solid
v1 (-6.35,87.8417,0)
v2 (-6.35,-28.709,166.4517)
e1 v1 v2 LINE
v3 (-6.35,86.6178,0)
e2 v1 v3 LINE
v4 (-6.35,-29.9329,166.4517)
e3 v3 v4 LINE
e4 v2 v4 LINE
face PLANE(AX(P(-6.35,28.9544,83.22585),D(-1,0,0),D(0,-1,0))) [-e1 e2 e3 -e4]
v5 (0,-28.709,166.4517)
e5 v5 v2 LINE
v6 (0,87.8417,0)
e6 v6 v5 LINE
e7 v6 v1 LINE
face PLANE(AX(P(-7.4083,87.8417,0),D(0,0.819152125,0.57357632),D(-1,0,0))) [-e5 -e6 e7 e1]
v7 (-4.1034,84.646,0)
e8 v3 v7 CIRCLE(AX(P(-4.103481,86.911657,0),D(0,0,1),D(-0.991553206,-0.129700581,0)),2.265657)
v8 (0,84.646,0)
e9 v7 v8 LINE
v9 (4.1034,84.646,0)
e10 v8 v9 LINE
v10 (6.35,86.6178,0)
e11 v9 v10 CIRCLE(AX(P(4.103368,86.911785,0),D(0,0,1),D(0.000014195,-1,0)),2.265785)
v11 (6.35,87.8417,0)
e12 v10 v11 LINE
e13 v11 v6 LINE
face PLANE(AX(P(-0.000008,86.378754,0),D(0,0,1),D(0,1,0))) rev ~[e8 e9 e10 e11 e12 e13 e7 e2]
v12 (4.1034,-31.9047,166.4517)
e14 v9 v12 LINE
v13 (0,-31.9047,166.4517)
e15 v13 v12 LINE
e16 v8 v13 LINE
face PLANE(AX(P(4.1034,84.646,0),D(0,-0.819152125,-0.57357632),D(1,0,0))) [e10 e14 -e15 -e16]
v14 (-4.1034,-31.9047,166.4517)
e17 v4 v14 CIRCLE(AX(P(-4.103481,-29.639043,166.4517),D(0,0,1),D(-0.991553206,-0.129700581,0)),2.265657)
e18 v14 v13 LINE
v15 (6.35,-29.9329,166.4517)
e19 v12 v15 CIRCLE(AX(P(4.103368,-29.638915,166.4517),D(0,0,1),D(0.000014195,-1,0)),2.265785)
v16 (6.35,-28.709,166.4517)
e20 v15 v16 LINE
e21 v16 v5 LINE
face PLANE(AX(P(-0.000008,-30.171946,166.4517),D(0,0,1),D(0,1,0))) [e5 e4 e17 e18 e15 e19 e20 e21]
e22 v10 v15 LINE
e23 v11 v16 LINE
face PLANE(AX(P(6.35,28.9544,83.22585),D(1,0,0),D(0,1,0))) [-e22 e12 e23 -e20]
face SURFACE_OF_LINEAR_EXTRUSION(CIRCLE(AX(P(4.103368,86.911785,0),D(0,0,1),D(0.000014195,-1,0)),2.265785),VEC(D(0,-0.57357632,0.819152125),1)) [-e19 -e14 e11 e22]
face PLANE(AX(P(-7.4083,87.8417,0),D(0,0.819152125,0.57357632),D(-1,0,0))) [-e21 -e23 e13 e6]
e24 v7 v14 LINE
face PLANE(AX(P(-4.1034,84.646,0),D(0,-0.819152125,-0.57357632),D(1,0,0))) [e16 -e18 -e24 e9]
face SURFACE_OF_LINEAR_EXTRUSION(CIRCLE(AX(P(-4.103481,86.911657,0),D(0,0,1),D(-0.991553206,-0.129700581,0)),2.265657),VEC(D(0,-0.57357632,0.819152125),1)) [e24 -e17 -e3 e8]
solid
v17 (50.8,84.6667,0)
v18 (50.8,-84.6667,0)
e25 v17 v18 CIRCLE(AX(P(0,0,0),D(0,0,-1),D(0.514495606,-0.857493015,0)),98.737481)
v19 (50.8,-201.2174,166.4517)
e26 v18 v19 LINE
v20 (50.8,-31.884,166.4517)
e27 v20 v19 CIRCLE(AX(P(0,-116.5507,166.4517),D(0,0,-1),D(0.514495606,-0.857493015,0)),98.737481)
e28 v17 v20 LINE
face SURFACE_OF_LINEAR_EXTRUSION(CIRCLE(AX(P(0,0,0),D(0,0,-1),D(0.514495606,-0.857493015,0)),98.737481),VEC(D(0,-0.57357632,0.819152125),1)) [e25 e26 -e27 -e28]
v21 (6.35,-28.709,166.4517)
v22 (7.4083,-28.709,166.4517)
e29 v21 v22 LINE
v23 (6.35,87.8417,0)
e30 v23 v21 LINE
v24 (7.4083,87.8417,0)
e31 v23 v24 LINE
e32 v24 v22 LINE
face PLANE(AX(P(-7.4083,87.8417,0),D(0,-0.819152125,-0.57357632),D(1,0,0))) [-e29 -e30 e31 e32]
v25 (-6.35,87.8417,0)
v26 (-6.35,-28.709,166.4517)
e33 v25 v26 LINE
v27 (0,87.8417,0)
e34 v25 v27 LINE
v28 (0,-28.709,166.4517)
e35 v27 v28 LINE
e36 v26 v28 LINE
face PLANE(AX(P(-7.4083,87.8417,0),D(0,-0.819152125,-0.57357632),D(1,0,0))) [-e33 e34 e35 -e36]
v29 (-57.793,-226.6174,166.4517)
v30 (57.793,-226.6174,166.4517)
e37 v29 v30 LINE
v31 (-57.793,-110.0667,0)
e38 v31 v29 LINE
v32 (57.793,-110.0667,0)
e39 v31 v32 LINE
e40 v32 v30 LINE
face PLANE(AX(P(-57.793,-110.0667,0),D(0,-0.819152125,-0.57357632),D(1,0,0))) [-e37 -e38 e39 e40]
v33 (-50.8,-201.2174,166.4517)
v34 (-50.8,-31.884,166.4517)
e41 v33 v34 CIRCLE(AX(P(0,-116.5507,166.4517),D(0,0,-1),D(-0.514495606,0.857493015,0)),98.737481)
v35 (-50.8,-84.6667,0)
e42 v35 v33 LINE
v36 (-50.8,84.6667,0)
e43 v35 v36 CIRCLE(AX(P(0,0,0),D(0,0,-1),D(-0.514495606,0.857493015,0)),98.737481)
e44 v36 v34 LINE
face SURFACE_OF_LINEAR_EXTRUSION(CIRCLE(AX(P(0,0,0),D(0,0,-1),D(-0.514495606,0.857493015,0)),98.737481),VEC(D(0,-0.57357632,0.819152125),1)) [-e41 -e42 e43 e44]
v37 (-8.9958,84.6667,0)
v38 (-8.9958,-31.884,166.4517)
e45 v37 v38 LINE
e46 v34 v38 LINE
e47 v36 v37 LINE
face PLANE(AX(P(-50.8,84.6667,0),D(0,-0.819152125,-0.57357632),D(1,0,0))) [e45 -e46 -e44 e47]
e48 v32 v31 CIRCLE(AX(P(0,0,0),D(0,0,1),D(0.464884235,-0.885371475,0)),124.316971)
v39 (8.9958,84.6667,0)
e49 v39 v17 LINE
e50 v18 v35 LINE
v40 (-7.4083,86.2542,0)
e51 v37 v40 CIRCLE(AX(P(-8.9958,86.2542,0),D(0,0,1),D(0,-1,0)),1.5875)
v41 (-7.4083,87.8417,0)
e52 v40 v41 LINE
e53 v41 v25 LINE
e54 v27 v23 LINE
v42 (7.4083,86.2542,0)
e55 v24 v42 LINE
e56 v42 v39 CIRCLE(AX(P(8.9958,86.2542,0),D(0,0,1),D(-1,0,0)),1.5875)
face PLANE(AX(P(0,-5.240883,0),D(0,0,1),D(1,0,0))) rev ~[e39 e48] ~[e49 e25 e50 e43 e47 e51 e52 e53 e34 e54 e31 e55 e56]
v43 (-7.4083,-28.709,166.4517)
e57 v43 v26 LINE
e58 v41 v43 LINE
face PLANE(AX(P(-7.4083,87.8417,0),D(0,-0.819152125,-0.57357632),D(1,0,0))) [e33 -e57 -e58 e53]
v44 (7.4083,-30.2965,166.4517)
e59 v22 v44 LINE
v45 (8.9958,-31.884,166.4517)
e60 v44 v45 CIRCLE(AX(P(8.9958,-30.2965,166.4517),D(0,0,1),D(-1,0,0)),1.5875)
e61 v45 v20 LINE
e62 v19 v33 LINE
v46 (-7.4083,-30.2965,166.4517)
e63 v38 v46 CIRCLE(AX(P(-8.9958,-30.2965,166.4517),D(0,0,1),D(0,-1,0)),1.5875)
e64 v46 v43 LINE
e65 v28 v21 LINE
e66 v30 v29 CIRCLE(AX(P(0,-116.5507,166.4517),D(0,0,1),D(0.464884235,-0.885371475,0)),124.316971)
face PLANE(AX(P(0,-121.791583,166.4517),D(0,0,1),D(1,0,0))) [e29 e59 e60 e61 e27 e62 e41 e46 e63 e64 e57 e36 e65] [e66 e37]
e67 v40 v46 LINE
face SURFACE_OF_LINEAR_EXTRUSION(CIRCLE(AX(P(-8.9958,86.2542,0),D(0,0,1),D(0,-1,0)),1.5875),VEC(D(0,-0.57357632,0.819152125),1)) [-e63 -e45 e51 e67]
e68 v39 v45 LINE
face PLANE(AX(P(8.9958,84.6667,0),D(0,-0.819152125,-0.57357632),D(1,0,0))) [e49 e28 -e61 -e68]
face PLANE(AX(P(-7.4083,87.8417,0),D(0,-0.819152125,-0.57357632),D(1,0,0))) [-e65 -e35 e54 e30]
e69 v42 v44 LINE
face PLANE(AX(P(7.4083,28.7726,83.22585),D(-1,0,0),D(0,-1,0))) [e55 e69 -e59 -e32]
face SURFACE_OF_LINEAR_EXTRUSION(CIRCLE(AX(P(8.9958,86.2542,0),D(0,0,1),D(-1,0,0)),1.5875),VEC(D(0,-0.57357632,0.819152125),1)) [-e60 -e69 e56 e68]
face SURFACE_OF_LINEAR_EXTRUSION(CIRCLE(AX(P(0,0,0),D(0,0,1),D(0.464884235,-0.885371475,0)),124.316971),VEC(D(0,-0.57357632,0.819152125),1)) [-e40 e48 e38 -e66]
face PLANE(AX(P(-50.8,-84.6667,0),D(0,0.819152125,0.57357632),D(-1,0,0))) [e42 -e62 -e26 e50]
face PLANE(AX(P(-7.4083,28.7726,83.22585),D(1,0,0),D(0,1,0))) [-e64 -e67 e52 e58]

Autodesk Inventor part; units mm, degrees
ref_plane "YZ Plane" through (0, 0, 0) normal (1, 0, 0) x (0, 1, 0)
ref_plane "XZ Plane" through (0, 0, 0) normal (0, 1, 0) x (-1, 0, 0)
sketch "Sketch1" plane through (0, 0, 0) normal (0, 0, 1) x (1, 0, 0)
  line L0 (-50.8, -84.6667) -> (50.8, -84.6667)
  arc A0 (57.793, -110.0667) -> (-57.793, -110.0667) centre (0, 0) ccw
  arc A1 (-50.8, 84.6667) -> (-50.8, -84.6667) centre (0, 0) ccw
  arc A2 (50.8, -84.6667) -> (50.8, 84.6667) centre (0, 0) ccw
  line L1 (-57.793, -110.0667) -> (57.793, -110.0667)
  line L2 (0, 84.6667) -> (8.9958, 84.6667) construction
  arc A3 (7.4083, 86.2542) -> (8.9958, 84.6667) centre (8.9958, 86.2542) ccw
  arc A4 (-8.9958, 84.6667) -> (-7.4083, 86.2542) centre (-8.9958, 86.2542) ccw
  line L3 (0, 84.6667) -> (0, 87.8417) construction
  line L4 (-7.4083, 87.8417) -> (-7.4083, 86.2542)
  line L5 (7.4083, 87.8417) -> (7.4083, 86.2542)
  line L6 (-7.4083, 87.8417) -> (7.4083, 87.8417)
  line L7 (-8.9958, 84.6667) -> (0, 84.6667) construction
  line L8 (0, 84.646) -> (0, 87.8417) construction
  line L9 (4.1034, 84.646) -> (0, 84.646)
  line L10 (6.35, 87.8417) -> (0, 87.8417)
  line L11 (6.3485, 84.6667) -> (3.1743, 87.8409) construction
  line L12 (6.35, 87.8417) -> (6.35, 86.6178)
  arc A5 (4.1034, 84.646) -> (6.35, 86.6178) centre (4.1034, 86.9117) ccw
  arc A6 (6.35, 87.8417) -> (3.1736, 84.646) centre (6.3485, 84.6667) ccw construction
  line L13 (7.4083, 87.8417) -> (-7.4083, 87.8417)
  line L14 (-4.1034, 84.646) -> (0, 84.646)
  line L15 (-6.35, 87.8417) -> (0, 87.8417)
  line L16 (-6.3485, 84.6667) -> (-3.1743, 87.8409) construction
  line L17 (-6.35, 87.8417) -> (-6.35, 86.6178)
  arc A7 (-6.35, 86.6178) -> (-4.1034, 84.646) centre (-4.1034, 86.9117) ccw
  arc A8 (-3.1736, 84.646) -> (-6.35, 87.8417) centre (-6.3485, 84.6667) ccw construction
  line L18 (-50.8, 84.6667) -> (-8.9958, 84.6667)
  line L19 (8.9958, 84.6667) -> (50.8, 84.6667)
  dimension "d1" = 101.6
  dimension "d2" = 25.4
  dimension "d34" = 14.8167
  dimension "d35" = 1.5875
  dimension "d36" = 1.5875
  dimension "d37" = 6.35
  dimension "d38" = 3.175
  dimension "d39" = 45
  dimension "d40" = 2.2657
  dimension "d41" = 2.2466
ref_plane "Work Plane2" through (0, 0, 203.2) normal (0, 0, 1) x (1, 0, 0)
sketch "Sketch6" plane through (0, 0, 0) normal (1, 0, 0) x (0, 1, 0)
  line L0 (-110.0667, 0) -> (124.3169, 0) projected
  line L1 (-83.4784, 0) -> (-200.0291, 166.4517)
  point P0 (0, 0)
  dimension "d28" = 203.2
  dimension "d29" = 55
sweep "ramp" add profiles "Sketch1" path "Sketch6" path curves L1
sweep "light angle" add profiles "Sketch1" path "Sketch6" separate body path curves L1 contours L6 L12 A5 L9 L14 A7 L17
equation "\"d35\" = 0.5 * d42"
equation "\"d42\" = 3.175"
properties part number "ramp"
